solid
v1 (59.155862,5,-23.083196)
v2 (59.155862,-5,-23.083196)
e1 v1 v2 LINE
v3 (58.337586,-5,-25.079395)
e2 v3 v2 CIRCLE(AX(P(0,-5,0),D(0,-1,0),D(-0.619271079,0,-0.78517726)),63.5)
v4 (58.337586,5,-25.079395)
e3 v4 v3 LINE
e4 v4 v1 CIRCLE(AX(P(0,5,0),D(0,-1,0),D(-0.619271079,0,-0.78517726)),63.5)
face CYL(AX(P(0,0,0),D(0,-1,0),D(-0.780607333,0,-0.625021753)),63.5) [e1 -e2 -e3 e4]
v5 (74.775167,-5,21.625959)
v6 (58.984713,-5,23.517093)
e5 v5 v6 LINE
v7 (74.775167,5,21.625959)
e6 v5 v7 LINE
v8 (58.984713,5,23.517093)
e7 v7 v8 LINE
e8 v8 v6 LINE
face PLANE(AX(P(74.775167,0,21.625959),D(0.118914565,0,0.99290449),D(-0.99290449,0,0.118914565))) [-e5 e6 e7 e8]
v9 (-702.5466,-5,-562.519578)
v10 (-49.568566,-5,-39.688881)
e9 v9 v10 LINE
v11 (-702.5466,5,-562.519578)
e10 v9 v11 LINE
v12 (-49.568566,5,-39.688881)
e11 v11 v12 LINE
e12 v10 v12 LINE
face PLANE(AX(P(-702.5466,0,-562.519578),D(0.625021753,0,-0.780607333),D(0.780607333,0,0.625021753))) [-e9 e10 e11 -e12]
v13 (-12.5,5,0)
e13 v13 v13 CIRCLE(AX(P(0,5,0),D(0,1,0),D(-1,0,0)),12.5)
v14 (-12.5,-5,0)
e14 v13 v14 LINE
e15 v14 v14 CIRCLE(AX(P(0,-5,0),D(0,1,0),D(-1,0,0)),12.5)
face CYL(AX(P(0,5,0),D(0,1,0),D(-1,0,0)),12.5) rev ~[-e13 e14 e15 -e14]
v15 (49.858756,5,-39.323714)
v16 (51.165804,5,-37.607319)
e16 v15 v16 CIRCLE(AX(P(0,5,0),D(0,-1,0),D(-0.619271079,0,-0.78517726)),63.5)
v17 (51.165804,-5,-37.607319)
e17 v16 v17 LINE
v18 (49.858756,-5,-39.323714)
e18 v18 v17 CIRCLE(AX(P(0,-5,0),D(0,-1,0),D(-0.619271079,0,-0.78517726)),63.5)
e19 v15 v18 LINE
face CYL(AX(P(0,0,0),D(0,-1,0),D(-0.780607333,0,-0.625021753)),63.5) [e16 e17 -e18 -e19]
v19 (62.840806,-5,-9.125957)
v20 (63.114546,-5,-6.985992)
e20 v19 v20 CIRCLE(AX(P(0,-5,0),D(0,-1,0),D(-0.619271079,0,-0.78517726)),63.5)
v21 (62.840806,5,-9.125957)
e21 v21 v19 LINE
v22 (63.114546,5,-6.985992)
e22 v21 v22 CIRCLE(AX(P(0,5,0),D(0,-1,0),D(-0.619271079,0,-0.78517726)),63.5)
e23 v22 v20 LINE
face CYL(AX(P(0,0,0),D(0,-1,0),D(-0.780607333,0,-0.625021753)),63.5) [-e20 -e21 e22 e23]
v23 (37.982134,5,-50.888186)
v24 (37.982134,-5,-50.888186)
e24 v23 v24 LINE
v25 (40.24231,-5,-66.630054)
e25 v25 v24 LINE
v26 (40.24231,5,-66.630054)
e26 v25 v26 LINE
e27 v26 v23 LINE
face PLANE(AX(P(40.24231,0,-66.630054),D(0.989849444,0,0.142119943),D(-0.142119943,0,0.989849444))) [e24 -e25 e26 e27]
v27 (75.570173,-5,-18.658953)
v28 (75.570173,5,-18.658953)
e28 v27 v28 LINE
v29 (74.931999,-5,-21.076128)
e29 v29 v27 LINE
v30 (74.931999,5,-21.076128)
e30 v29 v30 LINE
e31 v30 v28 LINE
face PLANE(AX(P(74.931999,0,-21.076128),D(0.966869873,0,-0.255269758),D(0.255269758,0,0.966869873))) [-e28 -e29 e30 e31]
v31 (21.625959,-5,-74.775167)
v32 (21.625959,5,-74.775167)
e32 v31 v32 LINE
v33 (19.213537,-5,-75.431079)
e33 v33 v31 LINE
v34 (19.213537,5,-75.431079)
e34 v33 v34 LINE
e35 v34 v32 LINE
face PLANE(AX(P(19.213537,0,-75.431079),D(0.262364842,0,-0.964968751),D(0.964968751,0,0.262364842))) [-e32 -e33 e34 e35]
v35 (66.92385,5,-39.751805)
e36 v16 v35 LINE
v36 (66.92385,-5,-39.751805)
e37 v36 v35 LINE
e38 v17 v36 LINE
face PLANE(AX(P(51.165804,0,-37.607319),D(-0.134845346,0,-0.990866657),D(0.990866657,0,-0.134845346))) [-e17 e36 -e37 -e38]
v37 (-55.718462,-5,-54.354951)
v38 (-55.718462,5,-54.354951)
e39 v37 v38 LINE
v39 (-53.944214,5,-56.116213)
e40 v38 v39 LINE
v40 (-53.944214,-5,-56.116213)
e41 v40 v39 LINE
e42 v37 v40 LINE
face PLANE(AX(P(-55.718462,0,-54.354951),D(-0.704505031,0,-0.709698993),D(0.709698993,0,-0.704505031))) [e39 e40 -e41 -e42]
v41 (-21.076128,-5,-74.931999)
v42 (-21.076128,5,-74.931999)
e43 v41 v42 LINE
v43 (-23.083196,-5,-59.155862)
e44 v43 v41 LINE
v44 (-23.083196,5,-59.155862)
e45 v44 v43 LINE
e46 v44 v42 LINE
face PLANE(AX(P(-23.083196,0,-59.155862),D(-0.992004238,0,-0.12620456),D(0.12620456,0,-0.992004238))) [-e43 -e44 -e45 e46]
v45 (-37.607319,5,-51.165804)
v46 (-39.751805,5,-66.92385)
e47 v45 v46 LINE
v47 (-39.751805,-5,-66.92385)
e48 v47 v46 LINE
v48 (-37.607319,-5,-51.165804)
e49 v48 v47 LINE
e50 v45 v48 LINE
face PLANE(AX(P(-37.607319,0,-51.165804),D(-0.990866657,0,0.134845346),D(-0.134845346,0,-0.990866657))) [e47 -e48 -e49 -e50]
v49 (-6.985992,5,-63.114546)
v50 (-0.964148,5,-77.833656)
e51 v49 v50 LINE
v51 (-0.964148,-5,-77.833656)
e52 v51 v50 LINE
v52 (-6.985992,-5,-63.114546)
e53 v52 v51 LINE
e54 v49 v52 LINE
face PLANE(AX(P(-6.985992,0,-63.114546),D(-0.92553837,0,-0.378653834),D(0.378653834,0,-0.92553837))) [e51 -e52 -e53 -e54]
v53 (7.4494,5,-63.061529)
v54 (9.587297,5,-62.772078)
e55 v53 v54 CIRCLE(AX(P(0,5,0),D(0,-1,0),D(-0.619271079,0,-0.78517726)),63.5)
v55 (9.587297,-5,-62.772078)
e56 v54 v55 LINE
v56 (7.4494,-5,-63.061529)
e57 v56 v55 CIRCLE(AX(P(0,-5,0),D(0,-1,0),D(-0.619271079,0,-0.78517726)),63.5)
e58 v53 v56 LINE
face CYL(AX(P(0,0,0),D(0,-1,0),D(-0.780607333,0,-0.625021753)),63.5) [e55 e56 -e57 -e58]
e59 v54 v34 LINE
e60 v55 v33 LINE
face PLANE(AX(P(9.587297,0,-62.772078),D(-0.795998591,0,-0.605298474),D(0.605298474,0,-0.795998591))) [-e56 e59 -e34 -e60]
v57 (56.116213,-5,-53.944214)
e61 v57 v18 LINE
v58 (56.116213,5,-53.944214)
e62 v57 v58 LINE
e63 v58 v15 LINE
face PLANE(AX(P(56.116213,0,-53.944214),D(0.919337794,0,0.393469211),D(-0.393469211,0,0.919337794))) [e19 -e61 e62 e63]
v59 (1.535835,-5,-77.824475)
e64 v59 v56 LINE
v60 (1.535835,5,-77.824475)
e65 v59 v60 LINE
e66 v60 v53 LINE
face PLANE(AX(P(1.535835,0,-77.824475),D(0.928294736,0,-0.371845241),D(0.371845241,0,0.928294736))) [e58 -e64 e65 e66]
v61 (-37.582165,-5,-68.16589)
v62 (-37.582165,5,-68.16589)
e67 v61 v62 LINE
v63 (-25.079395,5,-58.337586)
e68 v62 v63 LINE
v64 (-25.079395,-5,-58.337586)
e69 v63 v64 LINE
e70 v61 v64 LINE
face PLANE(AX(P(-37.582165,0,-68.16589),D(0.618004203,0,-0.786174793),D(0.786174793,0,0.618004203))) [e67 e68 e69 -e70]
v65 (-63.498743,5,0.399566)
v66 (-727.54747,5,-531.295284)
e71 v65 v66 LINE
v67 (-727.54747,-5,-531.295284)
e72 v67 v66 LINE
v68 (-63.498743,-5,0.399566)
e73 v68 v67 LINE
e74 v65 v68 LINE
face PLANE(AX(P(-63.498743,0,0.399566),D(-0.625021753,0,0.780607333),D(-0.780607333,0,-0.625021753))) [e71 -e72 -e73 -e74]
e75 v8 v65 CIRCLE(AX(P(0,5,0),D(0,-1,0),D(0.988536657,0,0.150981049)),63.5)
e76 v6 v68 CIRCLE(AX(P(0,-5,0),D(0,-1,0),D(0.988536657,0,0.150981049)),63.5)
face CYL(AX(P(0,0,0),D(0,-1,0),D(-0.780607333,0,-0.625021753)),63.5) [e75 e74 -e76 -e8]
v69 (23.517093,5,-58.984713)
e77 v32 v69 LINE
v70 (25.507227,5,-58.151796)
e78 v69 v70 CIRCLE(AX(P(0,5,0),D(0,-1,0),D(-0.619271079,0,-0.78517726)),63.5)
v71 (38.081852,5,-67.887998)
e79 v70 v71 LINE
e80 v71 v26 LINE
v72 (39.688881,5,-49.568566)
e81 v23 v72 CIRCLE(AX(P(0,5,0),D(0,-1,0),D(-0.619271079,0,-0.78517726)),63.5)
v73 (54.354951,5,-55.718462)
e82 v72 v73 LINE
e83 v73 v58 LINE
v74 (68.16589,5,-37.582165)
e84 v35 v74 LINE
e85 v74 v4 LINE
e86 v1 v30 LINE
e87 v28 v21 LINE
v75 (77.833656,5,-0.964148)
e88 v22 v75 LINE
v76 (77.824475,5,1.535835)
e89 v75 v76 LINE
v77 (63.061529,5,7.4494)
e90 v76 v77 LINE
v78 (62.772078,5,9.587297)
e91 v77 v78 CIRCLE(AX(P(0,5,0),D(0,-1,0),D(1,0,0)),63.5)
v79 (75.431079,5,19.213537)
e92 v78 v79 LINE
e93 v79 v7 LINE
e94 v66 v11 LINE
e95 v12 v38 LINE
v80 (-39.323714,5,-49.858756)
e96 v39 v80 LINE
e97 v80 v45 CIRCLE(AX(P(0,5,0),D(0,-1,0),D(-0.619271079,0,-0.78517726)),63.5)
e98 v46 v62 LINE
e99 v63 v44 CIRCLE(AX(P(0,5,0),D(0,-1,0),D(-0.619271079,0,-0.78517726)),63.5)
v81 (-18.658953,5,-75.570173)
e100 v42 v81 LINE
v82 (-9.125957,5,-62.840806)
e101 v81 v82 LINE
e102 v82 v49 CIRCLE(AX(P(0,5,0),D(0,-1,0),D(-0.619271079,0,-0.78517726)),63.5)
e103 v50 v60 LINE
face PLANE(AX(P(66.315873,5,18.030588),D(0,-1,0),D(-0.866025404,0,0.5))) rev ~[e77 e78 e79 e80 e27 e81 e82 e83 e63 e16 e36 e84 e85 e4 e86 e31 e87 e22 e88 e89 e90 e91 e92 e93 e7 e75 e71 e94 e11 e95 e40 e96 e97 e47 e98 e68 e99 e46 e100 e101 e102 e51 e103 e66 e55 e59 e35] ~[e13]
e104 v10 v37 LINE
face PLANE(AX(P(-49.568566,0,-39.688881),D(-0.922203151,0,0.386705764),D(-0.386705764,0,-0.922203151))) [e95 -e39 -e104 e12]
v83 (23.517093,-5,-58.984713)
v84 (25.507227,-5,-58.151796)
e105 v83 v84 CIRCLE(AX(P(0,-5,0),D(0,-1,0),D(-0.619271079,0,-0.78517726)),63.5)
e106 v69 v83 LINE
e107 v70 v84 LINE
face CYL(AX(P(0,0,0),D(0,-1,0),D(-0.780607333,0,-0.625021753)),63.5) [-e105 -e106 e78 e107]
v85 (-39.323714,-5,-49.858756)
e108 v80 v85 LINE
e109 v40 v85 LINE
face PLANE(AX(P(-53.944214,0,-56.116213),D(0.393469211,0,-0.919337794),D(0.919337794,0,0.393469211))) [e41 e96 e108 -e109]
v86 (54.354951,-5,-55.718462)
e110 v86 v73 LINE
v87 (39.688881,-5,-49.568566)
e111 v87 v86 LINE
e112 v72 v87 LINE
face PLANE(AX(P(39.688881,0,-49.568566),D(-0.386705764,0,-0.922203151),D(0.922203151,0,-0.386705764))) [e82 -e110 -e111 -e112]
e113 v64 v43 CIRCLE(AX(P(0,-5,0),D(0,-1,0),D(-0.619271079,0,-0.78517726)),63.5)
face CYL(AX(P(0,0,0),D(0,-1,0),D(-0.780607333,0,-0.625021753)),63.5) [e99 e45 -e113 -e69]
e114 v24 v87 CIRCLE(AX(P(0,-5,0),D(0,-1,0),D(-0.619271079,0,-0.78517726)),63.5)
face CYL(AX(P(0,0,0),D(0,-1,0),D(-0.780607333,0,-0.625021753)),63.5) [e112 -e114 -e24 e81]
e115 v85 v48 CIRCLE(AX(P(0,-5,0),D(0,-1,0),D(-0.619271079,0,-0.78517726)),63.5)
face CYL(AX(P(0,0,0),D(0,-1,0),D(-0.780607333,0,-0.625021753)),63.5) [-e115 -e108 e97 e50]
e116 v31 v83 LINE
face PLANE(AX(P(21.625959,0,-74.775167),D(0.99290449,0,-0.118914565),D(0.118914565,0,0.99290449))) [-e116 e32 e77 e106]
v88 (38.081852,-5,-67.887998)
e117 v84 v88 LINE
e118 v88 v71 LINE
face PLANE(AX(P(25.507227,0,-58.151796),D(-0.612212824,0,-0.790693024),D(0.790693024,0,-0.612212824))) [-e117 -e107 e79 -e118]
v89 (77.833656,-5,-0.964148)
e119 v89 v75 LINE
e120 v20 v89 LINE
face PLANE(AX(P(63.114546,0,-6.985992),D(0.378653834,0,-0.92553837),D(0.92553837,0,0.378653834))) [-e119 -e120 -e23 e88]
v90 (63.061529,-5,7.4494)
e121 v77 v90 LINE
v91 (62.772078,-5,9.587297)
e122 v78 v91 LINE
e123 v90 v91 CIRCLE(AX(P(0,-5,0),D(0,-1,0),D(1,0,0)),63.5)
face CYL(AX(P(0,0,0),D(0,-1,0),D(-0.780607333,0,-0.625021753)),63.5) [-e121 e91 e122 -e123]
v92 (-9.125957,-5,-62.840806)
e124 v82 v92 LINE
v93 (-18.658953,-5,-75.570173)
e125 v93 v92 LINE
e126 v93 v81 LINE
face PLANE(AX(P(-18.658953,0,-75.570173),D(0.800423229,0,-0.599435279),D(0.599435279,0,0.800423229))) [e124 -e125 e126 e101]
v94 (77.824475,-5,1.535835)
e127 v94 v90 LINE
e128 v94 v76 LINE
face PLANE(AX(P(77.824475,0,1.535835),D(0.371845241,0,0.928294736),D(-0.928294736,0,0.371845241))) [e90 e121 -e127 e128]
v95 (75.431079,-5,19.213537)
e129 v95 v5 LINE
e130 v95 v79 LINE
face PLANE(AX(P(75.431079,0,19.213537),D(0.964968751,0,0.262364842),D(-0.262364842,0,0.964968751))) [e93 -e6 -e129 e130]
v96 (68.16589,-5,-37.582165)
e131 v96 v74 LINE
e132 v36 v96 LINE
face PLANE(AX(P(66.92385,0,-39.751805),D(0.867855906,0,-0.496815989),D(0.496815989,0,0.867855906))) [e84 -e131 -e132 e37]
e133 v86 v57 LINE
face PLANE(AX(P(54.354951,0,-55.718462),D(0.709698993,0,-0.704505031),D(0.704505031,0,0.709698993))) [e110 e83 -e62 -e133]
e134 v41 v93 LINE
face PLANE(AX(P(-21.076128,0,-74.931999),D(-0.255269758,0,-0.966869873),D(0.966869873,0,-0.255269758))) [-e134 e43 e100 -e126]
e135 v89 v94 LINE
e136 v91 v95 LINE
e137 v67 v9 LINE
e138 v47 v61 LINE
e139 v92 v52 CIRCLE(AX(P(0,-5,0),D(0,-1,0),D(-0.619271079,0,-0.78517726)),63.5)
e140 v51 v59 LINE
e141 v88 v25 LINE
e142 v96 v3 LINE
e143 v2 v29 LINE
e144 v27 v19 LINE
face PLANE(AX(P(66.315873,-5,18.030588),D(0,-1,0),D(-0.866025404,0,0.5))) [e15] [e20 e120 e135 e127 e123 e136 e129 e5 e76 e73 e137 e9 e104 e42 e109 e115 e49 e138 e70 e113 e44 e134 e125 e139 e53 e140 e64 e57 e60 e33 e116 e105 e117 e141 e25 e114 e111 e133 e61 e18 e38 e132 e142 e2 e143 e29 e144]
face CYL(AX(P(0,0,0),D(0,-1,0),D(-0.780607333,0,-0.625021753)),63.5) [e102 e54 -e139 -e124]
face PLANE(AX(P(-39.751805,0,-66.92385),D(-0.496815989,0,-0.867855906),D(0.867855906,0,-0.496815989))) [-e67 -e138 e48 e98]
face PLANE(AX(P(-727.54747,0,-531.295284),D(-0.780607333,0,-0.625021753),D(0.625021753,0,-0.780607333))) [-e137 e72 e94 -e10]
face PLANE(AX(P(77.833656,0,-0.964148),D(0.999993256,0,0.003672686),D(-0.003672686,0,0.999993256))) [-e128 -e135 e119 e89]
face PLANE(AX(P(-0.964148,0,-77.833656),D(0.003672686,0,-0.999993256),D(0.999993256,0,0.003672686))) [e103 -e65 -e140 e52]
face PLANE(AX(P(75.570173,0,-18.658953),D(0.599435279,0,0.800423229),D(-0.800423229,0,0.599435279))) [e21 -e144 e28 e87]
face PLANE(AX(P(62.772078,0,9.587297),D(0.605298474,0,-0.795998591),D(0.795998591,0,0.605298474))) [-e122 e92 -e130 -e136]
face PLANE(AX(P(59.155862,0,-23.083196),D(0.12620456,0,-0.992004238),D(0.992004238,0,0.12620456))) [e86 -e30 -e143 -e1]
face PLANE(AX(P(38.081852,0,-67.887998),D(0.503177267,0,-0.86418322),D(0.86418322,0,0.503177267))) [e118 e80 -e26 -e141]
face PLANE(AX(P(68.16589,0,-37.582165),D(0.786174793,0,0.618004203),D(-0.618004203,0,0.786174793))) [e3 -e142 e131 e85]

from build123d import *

# Parameters (mm, degrees)
F1_DEPTH        = 5
F2_DEPTH        = 5
F2_COPIES_COUNT = 11
F2_COPIES_ANGLE = 150
F3_R            = 12.5
F4_DEPTH        = 10.001


# Not quite as in the source:
# - a pattern or mirror of a feature is missing from the dataset's text; its kind, count and spacing are read off the source's solid


with BuildPart() as f1:
    # F0 (on Front) → F1 (new body, symmetric)
    with BuildSketch(Plane.XZ):
        with BuildLine():
            Line((-25.0008701164, 31.2242933215), (-63.4987428752, 0.3995663471))
            ThreePointArc((-63.4987428752, 0.3995663471), (-59.9818720369, -20.842865133), (-49.5685656478, -39.6888813097))
            Line((-49.5685656478, -39.6888813097), (0, 0))
            Line((0, 0), (-25.0008701164, 31.2242933215))
        make_face()
        with BuildLine():
            Line((0, 0), (62.772077735, 9.5872966381))
            ThreePointArc((62.772077735, 9.5872966381), (-4.6082108818, 63.3325697605), (-63.4987428752, 0.3995663471))
            Line((-63.4987428752, 0.3995663471), (-25.0008701164, 31.2242933215))
            Line((-25.0008701164, 31.2242933215), (0, 0))
        make_face()
        with BuildLine():
            ThreePointArc((-39.3237135407, -49.8587560351), (27.705542678, -57.1371412036), (63.5, 0))
            ThreePointArc((63.5, 0), (63.3177579206, 4.8074454664), (62.772077735, 9.5872966381))
            Line((62.772077735, 9.5872966381), (0, 0))
            Line((0, 0), (-49.5685656478, -39.6888813097))
            ThreePointArc((-49.5685656478, -39.6888813097), (-44.7360694833, -45.065886069), (-39.3237135407, -49.8587560351))
        make_face()
        with BuildLine():
            ThreePointArc((-49.5685656478, -39.6888813097), (-59.9818720369, -20.842865133), (-63.4987428752, 0.3995663471))
            Line((-63.4987428752, 0.3995663471), (-727.5474698493, -531.2952842967))
            Line((-727.5474698493, -531.2952842967), (-702.5465997329, -562.5195776181))
            Line((-702.5465997329, -562.5195776181), (-49.5685656478, -39.6888813097))
        make_face()
    extrude(amount=F1_DEPTH, both=True)

    # F0 (on Front) → F2 (join, symmetric)
    with BuildSketch(Plane.XZ):
        with BuildLine():
            Line((-53.9442142409, -56.1162132047), (-39.3237135407, -49.8587560351))
            ThreePointArc((-39.3237135407, -49.8587560351), (-44.7360694833, -45.065886069), (-49.5685656478, -39.6888813097))
            Line((-49.5685656478, -39.6888813097), (-55.718461724, -54.3549506266))
            Line((-55.718461724, -54.3549506266), (-53.9442142409, -56.1162132047))
        make_face()
    f2 = extrude(amount=F2_DEPTH, both=True)

    # F2_copies: F2 ×11 about axis
    f2_copies_axis = Axis((0, 0, 0), (0, -1, 0))
    for i in range(1, F2_COPIES_COUNT):
        add(f2.rotate(f2_copies_axis, i * F2_COPIES_ANGLE / (F2_COPIES_COUNT - 1)))

    # F3 (on face) → F4 (cut, through all)
    with BuildSketch(Plane(origin=(0, 5, 0), x_dir=(-1, 0, 0), z_dir=(0, 1, 0))):
        Circle(F3_R)
    extrude(amount=-F4_DEPTH, mode=Mode.SUBTRACT)


solid = f1.part
